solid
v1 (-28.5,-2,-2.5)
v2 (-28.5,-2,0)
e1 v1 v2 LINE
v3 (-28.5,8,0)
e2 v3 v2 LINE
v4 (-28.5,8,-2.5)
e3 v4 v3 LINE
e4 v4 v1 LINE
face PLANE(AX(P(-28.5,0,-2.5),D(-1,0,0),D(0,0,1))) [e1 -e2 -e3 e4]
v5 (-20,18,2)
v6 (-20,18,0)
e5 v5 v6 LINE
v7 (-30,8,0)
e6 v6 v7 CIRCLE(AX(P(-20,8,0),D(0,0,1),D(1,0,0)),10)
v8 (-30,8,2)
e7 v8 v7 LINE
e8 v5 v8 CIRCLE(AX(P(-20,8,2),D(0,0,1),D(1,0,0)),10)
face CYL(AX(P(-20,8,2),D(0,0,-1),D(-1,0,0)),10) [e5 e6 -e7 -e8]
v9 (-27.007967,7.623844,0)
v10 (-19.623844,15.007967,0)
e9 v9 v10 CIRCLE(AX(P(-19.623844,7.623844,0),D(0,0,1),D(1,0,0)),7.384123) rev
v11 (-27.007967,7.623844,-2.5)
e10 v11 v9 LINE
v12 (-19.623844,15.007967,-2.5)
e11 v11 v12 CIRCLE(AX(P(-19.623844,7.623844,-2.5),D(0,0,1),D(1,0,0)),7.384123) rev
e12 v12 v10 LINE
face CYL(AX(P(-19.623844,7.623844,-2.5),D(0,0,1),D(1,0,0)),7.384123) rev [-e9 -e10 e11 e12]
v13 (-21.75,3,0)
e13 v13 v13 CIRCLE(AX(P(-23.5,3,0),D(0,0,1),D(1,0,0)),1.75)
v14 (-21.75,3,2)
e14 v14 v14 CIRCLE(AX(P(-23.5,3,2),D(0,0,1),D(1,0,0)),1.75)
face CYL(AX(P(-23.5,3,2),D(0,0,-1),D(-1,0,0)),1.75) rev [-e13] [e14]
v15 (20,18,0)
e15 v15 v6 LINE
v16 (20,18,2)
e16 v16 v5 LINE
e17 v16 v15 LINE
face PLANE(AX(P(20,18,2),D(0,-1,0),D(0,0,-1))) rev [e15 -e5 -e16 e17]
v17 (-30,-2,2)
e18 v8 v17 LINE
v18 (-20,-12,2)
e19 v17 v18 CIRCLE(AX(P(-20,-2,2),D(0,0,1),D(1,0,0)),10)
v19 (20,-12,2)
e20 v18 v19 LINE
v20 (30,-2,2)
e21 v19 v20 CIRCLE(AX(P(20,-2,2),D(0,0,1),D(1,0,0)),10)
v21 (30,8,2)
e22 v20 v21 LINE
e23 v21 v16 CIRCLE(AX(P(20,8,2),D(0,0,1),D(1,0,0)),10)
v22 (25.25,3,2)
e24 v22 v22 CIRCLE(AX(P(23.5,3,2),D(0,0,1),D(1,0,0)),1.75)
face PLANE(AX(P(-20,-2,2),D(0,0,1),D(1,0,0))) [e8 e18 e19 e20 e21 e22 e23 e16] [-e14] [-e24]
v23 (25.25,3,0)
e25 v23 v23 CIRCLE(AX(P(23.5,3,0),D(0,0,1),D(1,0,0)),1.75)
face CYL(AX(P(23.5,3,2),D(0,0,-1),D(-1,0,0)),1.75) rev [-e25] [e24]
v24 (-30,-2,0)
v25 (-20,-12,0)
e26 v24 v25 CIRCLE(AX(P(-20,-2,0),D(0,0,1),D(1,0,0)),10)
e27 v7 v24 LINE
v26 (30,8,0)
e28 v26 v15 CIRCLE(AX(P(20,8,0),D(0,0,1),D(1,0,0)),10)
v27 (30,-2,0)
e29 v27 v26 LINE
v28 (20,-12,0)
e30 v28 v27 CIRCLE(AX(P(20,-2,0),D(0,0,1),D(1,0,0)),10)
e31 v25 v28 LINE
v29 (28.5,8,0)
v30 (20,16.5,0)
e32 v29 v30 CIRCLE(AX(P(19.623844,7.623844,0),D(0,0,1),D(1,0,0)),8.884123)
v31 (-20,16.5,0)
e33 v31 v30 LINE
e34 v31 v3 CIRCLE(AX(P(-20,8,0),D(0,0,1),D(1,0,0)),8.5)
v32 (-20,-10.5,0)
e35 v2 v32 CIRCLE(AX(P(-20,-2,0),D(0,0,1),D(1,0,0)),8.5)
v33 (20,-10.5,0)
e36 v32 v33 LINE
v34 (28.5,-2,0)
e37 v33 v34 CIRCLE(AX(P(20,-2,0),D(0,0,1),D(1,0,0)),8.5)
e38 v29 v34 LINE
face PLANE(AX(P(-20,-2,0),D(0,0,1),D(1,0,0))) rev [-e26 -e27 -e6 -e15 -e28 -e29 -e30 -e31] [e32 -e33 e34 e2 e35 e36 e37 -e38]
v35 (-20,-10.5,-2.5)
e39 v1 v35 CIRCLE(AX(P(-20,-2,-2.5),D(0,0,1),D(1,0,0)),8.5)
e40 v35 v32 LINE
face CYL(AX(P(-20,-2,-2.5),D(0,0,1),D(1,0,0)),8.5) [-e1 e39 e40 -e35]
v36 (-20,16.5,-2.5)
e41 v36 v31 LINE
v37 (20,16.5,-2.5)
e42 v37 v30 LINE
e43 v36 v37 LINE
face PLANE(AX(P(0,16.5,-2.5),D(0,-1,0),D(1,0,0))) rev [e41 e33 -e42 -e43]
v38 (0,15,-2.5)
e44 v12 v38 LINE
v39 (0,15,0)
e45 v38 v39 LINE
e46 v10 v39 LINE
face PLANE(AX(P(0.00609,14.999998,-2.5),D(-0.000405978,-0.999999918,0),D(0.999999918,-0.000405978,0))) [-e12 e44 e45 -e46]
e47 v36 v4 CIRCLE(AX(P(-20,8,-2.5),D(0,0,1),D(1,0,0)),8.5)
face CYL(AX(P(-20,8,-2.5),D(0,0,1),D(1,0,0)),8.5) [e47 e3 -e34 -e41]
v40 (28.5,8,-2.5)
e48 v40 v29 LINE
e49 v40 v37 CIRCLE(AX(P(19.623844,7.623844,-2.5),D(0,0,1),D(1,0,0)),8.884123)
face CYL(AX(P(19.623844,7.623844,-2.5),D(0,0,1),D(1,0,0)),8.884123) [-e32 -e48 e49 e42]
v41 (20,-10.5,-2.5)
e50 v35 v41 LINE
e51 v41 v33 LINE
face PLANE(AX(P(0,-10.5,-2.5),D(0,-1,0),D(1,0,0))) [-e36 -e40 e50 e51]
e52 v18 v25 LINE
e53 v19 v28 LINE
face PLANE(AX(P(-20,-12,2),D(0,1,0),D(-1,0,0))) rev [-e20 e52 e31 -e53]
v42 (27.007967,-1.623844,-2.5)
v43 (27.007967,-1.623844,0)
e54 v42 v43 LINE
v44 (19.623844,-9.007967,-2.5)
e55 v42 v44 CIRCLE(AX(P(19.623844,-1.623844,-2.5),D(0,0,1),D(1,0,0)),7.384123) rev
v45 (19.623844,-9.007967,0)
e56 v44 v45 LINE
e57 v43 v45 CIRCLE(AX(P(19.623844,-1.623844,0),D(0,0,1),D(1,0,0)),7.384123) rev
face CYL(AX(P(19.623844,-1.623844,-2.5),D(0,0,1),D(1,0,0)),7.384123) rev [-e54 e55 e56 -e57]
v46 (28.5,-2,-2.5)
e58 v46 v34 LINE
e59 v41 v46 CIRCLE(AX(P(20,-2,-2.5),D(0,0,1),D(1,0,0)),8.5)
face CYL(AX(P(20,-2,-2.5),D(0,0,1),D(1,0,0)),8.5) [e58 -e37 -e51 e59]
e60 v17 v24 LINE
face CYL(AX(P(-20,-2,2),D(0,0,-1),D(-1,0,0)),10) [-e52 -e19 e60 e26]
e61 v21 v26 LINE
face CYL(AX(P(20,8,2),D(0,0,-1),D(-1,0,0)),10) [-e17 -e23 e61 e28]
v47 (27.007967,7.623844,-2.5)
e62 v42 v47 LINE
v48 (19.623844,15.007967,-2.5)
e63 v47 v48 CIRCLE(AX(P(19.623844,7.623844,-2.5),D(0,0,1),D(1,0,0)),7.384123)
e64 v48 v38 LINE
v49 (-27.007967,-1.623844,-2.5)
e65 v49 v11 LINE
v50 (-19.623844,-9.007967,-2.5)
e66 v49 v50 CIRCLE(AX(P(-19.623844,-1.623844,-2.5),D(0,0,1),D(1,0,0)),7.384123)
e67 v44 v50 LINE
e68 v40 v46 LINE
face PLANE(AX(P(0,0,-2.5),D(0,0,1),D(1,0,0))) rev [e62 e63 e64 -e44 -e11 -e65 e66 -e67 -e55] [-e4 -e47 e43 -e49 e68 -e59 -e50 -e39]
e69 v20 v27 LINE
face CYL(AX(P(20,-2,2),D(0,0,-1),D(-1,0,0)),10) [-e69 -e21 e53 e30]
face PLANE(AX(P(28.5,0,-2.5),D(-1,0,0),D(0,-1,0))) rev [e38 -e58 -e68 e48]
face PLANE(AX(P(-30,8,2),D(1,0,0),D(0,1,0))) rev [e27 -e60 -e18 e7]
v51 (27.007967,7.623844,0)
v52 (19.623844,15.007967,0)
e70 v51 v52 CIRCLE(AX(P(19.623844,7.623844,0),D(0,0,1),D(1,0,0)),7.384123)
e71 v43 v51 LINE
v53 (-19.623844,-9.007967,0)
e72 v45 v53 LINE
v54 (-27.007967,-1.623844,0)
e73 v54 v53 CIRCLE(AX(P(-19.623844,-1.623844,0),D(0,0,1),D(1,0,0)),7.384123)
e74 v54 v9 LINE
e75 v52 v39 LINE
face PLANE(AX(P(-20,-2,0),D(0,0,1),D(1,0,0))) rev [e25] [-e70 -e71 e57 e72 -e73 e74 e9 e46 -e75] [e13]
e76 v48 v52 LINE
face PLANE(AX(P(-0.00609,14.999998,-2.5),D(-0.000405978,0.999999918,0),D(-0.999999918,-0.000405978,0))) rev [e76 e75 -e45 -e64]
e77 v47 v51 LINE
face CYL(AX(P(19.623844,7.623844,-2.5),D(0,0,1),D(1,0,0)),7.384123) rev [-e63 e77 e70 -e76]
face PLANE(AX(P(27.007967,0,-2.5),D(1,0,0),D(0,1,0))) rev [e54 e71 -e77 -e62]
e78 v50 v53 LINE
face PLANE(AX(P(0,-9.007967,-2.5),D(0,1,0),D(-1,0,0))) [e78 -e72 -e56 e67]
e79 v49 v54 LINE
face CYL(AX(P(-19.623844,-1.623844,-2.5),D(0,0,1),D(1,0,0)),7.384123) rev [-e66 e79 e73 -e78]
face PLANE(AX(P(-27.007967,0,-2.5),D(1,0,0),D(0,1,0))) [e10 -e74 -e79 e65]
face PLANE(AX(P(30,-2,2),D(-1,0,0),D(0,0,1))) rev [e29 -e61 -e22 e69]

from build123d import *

# Parameters (mm, degrees)
SKETCH_9_R      = 1.75
EXTRUDE_3_DEPTH = 2
EXTRUDE_START   = -2.5
EXTRUDE_4_DEPTH = 2.5


# Read off the part's stored shape, not the designer's step: Бобышка-Вытянуть4
with BuildPart() as part:
    # Эскиз9 → Бобышка-Вытянуть3 (new body)
    with BuildSketch(Plane.XY):
        with BuildLine():
            Line((-30, 8), (-30, -2))
            ThreePointArc((-30, -2), (-27.071067812, -9.071067812), (-20, -12))
            Line((-20, -12), (20, -12))
            ThreePointArc((20, -12), (27.071067812, -9.071067812), (30, -2))
            Line((30, -2), (30, 8))
            ThreePointArc((30, 8), (27.071067812, 15.071067812), (20, 18))
            Line((20, 18), (-20, 18))
            ThreePointArc((-20, 18), (-27.071067812, 15.071067812), (-30, 8))
        make_face()
        with Locations((23.5, 3)):
            Circle(SKETCH_9_R, mode=Mode.SUBTRACT)
        with Locations((-23.5, 3)):
            Circle(SKETCH_9_R, mode=Mode.SUBTRACT)
    extrude(amount=EXTRUDE_3_DEPTH)

    # Бобышка-Вытянуть4 outline → Бобышка-Вытянуть4 (add)
    with BuildSketch(Plane.XY.offset(EXTRUDE_START)):
        with BuildLine():
            Line((20, 16.5), (-20, 16.5))
            ThreePointArc((-20, 16.5), (-26.01040764, 14.01040764), (-28.5, 8))
            Line((-28.5, 8), (-28.5, -2))
            ThreePointArc((-28.5, -2), (-26.01040764, -8.01040764), (-20, -10.5))
            Line((-20, -10.5), (20, -10.5))
            ThreePointArc((20, -10.5), (26.01040764, -8.01040764), (28.5, -2))
            Line((28.5, -2), (28.5, 8))
            ThreePointArc((28.5, 8), (25.905867423, 13.905867423), (20, 16.5))
        make_face()
        with BuildLine():
            ThreePointArc((-19.623843683, -9.007966855), (-24.845207251, -6.845207251), (-27.007966855, -1.623843683))
            Line((-27.007966855, -1.623843683), (-27.007966855, 7.623843683))
            ThreePointArc((-27.007966855, 7.623843683), (-24.845207251, 12.845207251), (-19.623843683, 15.007966855))
            Line((-19.623843683, 15.007966855), (0, 15))
            Line((0, 15), (19.623843683, 15.007966855))
            ThreePointArc((19.623843683, 15.007966855), (24.845207251, 12.845207251), (27.007966855, 7.623843683))
            Line((27.007966855, 7.623843683), (27.007966855, -1.623843683))
            ThreePointArc((27.007966855, -1.623843683), (24.845207251, -6.845207251), (19.623843683, -9.007966855))
            Line((19.623843683, -9.007966855), (-19.623843683, -9.007966855))
        make_face(mode=Mode.SUBTRACT)
    extrude(amount=EXTRUDE_4_DEPTH)


solid = part.part
